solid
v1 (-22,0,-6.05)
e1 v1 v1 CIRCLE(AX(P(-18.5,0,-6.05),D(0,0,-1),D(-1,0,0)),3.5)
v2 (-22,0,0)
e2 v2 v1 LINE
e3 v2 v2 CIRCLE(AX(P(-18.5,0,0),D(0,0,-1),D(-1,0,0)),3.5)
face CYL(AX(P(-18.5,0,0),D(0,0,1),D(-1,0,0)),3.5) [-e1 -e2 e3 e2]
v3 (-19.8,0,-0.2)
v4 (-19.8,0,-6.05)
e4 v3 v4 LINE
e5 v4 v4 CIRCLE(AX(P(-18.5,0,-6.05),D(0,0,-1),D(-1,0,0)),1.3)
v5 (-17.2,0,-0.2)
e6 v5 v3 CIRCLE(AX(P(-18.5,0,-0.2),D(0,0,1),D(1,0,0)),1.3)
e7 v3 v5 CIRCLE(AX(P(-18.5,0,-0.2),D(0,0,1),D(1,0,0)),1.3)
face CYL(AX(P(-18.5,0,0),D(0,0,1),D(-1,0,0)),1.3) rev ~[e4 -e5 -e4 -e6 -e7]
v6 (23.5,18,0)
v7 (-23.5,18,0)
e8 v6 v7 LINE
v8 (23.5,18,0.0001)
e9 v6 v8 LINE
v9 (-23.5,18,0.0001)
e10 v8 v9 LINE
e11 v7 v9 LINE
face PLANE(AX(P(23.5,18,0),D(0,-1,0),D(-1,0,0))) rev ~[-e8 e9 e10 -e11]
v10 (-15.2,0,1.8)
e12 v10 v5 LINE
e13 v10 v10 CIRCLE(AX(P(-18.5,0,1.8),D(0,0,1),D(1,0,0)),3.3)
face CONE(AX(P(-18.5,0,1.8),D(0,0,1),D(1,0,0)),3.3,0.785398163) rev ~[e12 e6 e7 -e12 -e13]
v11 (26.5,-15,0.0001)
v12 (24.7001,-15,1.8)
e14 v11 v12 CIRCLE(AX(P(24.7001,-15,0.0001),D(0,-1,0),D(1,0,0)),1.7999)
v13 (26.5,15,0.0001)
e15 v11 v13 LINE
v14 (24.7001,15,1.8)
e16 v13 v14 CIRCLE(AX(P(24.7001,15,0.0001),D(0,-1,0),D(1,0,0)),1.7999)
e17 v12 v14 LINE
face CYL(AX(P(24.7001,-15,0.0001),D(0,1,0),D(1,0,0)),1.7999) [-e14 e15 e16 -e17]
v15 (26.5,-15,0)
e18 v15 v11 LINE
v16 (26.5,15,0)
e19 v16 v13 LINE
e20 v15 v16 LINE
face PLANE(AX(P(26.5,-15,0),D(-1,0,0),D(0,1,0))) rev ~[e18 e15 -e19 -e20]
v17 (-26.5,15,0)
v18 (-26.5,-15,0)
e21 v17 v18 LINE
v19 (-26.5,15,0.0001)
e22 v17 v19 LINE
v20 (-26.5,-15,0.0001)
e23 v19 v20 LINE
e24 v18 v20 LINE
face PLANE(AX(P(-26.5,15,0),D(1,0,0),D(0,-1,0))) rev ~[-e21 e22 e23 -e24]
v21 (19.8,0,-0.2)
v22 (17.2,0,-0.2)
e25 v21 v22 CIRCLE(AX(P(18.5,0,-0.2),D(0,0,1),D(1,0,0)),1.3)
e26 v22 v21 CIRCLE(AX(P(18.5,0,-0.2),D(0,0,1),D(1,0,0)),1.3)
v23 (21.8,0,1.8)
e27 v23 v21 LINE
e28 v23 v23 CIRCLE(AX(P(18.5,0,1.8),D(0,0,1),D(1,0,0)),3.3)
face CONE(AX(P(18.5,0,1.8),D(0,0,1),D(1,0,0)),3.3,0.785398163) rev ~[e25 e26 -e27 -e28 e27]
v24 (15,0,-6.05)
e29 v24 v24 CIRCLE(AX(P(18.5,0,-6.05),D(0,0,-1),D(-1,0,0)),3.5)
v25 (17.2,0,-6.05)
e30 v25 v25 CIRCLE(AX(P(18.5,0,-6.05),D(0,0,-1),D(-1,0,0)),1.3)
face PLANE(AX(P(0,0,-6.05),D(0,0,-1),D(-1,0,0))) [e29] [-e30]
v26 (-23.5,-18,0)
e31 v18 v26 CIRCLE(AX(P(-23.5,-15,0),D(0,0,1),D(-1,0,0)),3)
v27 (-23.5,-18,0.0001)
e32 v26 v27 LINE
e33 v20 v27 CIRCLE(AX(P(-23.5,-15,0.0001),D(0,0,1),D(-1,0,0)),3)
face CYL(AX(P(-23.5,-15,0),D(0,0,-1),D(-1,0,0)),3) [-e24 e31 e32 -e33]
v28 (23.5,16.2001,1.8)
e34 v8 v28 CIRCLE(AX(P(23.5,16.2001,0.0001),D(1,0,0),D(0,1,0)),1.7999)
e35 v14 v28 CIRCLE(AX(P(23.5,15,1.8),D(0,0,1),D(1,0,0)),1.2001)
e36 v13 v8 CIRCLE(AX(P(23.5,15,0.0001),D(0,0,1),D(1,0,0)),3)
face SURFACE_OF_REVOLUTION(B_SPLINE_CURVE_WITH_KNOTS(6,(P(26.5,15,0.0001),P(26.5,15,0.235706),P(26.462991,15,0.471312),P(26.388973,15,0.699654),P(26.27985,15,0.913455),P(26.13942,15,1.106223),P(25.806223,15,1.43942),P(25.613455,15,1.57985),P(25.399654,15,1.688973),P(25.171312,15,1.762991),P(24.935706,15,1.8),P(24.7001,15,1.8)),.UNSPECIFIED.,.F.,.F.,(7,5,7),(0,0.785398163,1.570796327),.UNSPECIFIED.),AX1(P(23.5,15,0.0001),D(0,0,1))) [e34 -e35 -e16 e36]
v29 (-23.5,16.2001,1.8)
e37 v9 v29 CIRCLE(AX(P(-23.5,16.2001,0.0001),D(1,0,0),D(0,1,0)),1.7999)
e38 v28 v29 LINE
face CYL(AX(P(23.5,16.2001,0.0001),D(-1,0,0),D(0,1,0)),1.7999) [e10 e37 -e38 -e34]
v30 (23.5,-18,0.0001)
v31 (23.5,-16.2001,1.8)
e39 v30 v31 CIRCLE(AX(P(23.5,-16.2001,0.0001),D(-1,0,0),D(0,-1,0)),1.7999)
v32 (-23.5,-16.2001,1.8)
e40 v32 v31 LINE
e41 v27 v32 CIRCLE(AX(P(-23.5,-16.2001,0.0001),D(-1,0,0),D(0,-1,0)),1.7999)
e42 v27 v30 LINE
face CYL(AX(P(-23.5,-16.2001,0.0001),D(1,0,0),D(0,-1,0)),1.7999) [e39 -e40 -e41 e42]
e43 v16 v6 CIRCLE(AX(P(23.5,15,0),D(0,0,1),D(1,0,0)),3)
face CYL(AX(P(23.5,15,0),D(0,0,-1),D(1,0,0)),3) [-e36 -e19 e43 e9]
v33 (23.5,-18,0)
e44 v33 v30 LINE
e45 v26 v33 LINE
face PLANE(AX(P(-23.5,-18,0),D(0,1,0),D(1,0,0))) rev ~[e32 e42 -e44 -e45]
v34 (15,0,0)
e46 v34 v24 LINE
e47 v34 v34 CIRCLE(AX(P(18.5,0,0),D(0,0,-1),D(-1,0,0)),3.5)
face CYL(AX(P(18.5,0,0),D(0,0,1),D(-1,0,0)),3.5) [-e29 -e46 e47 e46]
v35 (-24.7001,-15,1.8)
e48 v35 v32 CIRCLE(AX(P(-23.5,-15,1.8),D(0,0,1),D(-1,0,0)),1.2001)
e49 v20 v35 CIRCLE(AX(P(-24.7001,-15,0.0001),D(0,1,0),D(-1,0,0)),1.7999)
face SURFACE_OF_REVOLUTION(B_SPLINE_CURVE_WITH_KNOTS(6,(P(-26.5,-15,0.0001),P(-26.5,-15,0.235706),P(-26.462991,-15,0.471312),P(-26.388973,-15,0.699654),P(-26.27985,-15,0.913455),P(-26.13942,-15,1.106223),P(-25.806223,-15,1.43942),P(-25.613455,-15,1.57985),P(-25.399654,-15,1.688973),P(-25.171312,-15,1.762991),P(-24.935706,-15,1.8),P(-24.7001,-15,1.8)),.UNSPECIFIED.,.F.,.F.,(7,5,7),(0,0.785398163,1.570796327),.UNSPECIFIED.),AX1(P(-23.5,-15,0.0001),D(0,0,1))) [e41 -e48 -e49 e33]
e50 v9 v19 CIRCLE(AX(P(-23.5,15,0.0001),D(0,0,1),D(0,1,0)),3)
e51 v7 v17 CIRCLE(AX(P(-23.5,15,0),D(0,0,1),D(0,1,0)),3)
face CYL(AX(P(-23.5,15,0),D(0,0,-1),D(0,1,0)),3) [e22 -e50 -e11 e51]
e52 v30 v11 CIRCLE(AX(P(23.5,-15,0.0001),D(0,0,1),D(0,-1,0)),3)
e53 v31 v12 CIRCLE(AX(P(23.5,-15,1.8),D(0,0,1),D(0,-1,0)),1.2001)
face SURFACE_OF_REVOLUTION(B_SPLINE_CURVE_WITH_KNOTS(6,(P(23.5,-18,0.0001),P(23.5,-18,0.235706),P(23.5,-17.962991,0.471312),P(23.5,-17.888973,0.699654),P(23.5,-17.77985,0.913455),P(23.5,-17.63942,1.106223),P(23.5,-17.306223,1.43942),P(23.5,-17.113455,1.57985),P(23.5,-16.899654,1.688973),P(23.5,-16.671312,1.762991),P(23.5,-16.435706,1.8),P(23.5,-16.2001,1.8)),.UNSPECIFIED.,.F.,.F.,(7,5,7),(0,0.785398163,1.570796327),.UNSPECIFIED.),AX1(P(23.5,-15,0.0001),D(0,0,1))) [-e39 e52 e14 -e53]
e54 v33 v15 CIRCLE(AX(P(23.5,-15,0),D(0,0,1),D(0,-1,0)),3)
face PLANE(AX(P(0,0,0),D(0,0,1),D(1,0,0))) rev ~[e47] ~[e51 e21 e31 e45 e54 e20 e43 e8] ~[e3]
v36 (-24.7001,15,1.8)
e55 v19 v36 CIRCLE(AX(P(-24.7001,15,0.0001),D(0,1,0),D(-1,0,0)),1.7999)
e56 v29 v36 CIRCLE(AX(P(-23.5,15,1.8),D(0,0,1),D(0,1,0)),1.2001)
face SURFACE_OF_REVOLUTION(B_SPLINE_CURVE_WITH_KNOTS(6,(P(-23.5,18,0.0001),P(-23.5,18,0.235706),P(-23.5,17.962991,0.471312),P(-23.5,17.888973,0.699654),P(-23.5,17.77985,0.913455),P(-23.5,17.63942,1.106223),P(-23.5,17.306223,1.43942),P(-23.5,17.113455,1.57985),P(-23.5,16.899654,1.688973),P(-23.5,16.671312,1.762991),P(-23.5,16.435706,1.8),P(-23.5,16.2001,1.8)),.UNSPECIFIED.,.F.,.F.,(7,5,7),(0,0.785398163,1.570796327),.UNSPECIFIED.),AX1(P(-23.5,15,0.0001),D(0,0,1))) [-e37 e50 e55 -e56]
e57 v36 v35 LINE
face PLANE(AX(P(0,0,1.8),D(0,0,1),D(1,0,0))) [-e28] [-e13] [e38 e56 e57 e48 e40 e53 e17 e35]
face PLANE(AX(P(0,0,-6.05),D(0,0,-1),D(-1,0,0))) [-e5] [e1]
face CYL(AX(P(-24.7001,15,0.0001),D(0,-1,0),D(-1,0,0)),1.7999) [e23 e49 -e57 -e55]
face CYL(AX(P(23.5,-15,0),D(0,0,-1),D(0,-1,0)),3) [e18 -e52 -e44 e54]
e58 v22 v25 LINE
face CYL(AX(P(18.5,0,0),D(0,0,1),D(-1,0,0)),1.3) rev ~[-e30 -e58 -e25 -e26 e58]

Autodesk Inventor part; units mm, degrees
ref_plane "YZ Plane" through (0, 0, 0) normal (1, 0, 0) x (0, 1, 0)
ref_plane "XZ Plane" through (0, 0, 0) normal (0, 1, 0) x (-1, 0, 0)
ref_plane "XY Plane" through (0, 0, 0) normal (0, 0, 1) x (1, 0, 0)
sketch "Sketch1" plane through (0, 0, 0) normal (0, 0, 1) x (1, 0, 0)
  line L0 (24.7, 16.2) -> (24.7, -16.2) projected
  line L1 (24.7, -16.2) -> (-24.7, -16.2) projected
  line L2 (-24.7, -16.2) -> (-24.7, 16.2) projected
  line L3 (-24.7, 16.2) -> (24.7, 16.2) projected
  arc A0 (26.5, 15) -> (23.5, 18) centre (23.5, 15) ccw projected
  line L4 (23.5, 18) -> (-23.5, 18) projected
  arc A1 (-23.5, 18) -> (-26.5, 15) centre (-23.5, 15) ccw projected
  line L5 (-26.5, 15) -> (-26.5, -15) projected
  arc A2 (-26.5, -15) -> (-23.5, -18) centre (-23.5, -15) ccw projected
  line L6 (-23.5, -18) -> (23.5, -18) projected
  arc A3 (23.5, -18) -> (26.5, -15) centre (23.5, -15) ccw projected
  line L7 (26.5, -15) -> (26.5, 15) projected
  point P0 (0, 0)
extrude "Extrusion1" add sketch "Sketch1" along normal blind 1.8 contours L0 L1 L2 L3 | L7 A3 L6 A2 L5 A1 L4 A0
sketch "Sketch2" plane through (0, 0, 1.8) normal (0, 0, 1) x (1, 0, 0)
  circle A0 centre (-18.5, 0) radius 1.3 projected
  circle A1 centre (18.5, 0) radius 1.3 projected
  point P0 (0, 0)
extrude "Extrusion2" cut sketch "Sketch2" against normal blind 1.8
sketch "Sketch3" plane through (0, 0, 0) normal (0, 0, -1) x (-1, 0, 0)
  circle A0 centre (18.5, 0) radius 1.3 projected
  circle A1 centre (-18.5, 0) radius 1.3 projected
  circle A2 centre (-18.5, 0) radius 3.5
  circle A3 centre (18.5, 0) radius 3.5
  point P0 (0, 0)
  dimension "d4" = 7
  dimension "d5" = 7
extrude "Extrusion3" add sketch "Sketch3" along normal blind 6.05
fillet "Fillet1" radius 1.8 8 edges at (-25.6213, 17.1213, 1.8) (-26.5, 0, 1.8) (-25.6213, -17.1213, 1.8) (0, -18, 1.8) (25.6213, -17.1213, 1.8) (26.5, 0, 1.8) (25.6213, 17.1213, 1.8) (0, 18, 1.8)
chamfer "Chamfer1" distance 2 angle 45 2 edges at (17.2, 0, 1.8) (-19.8, 0, 1.8)
properties part number "top"
